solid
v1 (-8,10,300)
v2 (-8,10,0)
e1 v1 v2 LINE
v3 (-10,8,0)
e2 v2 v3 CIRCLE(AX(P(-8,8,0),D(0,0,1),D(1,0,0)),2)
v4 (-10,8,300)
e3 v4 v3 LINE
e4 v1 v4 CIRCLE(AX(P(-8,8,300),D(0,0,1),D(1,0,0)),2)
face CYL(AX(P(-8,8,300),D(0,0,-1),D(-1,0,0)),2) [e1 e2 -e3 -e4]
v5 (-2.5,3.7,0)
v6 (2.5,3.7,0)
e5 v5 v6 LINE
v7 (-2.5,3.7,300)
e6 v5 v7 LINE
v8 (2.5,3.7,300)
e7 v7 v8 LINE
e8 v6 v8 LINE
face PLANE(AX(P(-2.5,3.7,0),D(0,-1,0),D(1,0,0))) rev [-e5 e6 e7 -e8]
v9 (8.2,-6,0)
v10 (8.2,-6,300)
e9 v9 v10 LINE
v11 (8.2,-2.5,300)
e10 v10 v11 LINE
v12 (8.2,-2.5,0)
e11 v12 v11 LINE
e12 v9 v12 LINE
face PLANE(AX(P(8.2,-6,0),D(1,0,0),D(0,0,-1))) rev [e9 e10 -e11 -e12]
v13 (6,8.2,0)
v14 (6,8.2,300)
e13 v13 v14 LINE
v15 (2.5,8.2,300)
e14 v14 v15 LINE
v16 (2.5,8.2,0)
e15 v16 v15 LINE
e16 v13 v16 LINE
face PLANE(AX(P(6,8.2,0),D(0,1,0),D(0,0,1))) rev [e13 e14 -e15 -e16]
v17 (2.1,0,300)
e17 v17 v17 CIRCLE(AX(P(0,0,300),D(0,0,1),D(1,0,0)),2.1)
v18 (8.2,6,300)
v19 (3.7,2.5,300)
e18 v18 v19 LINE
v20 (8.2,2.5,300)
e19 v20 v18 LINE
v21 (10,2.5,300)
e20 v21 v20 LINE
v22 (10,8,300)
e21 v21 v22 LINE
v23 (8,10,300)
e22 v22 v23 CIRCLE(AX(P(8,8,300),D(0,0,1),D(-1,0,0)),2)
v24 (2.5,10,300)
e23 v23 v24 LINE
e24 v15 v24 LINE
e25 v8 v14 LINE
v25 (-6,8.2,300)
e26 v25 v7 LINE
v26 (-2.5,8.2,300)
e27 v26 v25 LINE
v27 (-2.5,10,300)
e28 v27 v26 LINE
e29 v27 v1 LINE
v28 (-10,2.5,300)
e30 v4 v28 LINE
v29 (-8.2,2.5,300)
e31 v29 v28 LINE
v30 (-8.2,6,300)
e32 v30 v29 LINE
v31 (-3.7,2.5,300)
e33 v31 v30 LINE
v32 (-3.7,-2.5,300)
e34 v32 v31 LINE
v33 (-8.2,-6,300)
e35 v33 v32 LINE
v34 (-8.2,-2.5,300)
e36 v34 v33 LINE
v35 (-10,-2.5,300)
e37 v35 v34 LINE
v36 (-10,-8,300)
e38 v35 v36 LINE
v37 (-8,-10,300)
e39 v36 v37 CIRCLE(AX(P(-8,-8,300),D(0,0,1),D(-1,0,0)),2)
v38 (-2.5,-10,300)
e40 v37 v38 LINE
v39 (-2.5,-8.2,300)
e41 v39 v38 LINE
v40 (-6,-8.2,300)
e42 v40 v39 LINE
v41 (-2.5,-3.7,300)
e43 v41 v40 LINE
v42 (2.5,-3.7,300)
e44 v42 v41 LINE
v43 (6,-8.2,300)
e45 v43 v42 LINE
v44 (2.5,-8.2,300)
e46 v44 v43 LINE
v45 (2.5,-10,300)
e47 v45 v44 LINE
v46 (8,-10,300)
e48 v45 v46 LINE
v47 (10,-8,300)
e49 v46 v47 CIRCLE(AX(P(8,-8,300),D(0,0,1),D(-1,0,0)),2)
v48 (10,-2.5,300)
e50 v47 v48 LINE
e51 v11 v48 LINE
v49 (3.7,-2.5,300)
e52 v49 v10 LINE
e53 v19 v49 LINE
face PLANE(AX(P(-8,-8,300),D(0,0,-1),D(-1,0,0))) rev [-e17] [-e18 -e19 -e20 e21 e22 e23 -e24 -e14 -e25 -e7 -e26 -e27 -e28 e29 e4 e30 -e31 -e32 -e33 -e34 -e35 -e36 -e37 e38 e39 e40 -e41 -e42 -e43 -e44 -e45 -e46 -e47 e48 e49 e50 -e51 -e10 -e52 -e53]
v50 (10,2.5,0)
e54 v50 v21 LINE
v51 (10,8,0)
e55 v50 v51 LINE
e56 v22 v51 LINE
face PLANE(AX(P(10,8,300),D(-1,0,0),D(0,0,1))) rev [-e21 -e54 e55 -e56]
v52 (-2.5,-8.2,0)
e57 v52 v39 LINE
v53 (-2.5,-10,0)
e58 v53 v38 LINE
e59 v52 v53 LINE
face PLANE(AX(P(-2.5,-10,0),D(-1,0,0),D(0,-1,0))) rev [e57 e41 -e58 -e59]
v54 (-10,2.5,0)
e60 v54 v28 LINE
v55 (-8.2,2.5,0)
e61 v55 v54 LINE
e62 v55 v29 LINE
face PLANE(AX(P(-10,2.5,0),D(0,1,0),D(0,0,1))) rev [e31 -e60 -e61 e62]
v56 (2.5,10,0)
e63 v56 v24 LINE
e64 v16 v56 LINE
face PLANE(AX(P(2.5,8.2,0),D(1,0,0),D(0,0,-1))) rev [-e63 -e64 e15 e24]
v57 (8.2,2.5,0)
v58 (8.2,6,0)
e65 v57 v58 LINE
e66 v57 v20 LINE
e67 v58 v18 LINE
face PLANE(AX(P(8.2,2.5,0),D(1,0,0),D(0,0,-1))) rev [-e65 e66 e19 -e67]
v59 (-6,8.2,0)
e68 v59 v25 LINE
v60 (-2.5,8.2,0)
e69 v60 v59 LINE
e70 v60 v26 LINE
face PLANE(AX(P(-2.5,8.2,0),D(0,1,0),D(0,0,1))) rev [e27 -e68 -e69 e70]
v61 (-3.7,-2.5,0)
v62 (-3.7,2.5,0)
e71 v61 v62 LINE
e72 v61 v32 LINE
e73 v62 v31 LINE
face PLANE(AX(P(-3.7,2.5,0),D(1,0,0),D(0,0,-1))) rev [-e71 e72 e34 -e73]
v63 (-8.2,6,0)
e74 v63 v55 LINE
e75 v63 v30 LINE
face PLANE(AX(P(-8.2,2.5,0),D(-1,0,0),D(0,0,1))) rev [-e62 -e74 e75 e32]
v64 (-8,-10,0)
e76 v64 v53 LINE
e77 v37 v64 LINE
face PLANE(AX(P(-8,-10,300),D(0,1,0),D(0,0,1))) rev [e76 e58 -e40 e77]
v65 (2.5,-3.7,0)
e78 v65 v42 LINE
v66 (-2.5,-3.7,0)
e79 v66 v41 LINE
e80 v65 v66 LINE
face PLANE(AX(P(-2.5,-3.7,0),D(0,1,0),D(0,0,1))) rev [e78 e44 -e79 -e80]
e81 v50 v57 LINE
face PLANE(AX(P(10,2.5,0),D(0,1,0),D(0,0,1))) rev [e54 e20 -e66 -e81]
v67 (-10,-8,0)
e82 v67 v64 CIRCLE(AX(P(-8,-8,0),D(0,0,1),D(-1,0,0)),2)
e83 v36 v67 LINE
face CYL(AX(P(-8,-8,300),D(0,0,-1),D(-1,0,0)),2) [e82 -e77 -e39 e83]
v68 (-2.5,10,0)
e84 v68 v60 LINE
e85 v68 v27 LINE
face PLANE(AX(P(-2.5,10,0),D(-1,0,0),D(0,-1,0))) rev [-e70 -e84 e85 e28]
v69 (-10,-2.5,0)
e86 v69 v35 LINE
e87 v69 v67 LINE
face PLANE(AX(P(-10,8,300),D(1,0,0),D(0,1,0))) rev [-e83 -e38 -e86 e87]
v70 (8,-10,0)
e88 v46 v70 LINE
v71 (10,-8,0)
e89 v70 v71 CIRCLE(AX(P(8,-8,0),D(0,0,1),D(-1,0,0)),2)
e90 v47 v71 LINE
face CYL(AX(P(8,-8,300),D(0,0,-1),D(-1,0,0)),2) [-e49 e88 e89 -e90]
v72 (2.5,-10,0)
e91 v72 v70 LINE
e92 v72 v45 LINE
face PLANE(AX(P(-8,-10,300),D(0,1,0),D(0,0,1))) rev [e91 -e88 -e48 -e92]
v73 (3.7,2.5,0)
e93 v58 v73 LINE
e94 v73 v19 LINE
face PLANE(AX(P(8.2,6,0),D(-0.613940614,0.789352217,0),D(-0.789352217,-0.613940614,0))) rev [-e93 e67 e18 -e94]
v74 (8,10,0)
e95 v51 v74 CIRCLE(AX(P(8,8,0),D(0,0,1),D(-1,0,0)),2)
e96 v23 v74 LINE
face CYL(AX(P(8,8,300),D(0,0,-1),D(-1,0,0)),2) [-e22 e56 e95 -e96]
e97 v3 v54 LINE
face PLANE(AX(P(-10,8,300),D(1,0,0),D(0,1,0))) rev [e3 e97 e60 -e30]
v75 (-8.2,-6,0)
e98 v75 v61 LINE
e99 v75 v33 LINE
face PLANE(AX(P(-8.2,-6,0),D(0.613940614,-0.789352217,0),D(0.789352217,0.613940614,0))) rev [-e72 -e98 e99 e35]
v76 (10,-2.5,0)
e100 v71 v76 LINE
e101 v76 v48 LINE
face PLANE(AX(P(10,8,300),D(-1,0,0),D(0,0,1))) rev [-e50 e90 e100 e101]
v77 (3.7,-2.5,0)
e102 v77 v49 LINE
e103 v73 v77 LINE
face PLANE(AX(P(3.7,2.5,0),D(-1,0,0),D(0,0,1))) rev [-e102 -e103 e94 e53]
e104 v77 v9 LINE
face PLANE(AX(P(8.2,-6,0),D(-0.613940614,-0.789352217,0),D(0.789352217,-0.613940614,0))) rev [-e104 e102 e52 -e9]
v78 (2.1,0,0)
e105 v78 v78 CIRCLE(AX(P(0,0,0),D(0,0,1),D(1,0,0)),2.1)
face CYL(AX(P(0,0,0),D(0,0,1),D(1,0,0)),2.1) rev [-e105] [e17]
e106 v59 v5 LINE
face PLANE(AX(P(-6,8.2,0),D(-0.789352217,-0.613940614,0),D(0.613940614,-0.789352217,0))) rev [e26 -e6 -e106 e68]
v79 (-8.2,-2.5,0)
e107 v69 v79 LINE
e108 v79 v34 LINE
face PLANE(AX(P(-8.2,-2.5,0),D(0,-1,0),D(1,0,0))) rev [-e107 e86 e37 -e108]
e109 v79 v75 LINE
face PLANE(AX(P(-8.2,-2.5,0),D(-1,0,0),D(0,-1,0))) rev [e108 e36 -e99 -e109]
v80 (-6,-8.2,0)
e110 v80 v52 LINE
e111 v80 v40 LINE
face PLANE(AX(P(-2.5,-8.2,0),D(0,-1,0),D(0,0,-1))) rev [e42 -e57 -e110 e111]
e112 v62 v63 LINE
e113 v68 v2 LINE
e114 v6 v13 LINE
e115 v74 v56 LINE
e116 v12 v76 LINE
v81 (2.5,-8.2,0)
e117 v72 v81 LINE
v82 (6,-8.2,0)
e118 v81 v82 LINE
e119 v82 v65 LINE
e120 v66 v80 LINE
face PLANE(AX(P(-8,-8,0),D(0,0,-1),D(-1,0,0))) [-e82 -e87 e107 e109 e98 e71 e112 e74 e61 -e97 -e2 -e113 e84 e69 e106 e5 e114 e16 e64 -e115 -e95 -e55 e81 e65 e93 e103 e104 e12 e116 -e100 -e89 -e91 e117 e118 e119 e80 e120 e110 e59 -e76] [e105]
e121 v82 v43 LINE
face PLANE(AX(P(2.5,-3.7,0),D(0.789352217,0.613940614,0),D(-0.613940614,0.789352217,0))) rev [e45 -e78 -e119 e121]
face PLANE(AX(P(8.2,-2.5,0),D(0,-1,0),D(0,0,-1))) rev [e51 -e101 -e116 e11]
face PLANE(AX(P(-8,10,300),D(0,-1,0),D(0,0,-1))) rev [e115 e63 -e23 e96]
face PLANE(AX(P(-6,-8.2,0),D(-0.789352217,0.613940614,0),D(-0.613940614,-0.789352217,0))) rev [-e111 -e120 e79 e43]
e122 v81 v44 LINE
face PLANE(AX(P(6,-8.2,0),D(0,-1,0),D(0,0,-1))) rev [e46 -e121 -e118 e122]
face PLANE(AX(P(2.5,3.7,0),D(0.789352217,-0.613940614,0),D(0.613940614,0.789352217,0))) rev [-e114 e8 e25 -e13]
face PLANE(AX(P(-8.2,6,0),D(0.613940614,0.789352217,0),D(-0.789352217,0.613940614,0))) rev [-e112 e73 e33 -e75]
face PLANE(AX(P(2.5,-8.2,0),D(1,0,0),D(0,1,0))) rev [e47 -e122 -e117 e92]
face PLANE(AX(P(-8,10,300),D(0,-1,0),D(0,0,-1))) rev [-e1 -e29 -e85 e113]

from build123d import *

# Parameters (mm, degrees)
EXTRUSION1_DEPTH        = 300
PER_AGE1_OUTLINE_R      = 2.1
PER_AGE1_DEPTH          = 300
ENL_V_MAT_EXTRU_1_DEPTH = 300
ENL_V_MAT_EXTRU_3_DEPTH = 300
ENL_V_MAT_EXTRU_4_DEPTH = 301.333148354
ENL_V_MAT_EXTRU_7_DEPTH = 301.333148354


# Read off the part's stored shape, not the designer's step: Perçage1
with BuildPart() as part:
    # Esquisse1 → Extrusion1 (new body)
    with BuildSketch(Plane.XY):
        with BuildLine():
            Line((-10, 8), (-10, -8))
            ThreePointArc((-10, -8), (-9.414213562, -9.414213562), (-8, -10))
            Line((-8, -10), (8, -10))
            ThreePointArc((8, -10), (9.414213562, -9.414213562), (10, -8))
            Line((10, -8), (10, 8))
            ThreePointArc((10, 8), (9.414213562, 9.414213562), (8, 10))
            Line((8, 10), (-8, 10))
            ThreePointArc((-8, 10), (-9.414213562, 9.414213562), (-10, 8))
        make_face()
    extrude(amount=EXTRUSION1_DEPTH)

    # Perçage1 outline → Perçage1 (cut)
    with BuildSketch(Plane.XY):
        Circle(PER_AGE1_OUTLINE_R)
    extrude(amount=PER_AGE1_DEPTH, mode=Mode.SUBTRACT)

    # Esquisse3 → Enlèv. mat.-Extru.1 (cut)
    with BuildSketch(Plane.XY.offset(300)):
        Polygon((10, 2.5), (8.2, 2.5), (8.2, 6), (3.7, 2.5), (3.7, -2.5), (8.2, -6), (8.2, -2.5), (10, -2.5), align=None)
    extrude(amount=-ENL_V_MAT_EXTRU_1_DEPTH, mode=Mode.SUBTRACT)

    # Esquisse5 → Enlèv. mat.-Extru.3 (cut)
    with BuildSketch(Plane.XY.offset(300)):
        Polygon((-2.5, 10), (-2.5, 8.2), (-6, 8.2), (-2.5, 3.7), (2.5, 3.7), (6, 8.2), (2.5, 8.2), (2.5, 10), align=None)
    extrude(amount=-ENL_V_MAT_EXTRU_3_DEPTH, mode=Mode.SUBTRACT)

    # Esquisse6 → Enlèv. mat.-Extru.4 (cut, through all)
    with BuildSketch(Plane.XY.offset(300)):
        Polygon((-2.5, -10), (-2.5, -8.2), (-6, -8.2), (-2.5, -3.7), (2.5, -3.7), (6, -8.2), (2.5, -8.2), (2.5, -10), align=None)
    extrude(amount=-ENL_V_MAT_EXTRU_4_DEPTH, mode=Mode.SUBTRACT)

    # Esquisse4 → Enlèv. mat.-Extru.7 (cut, through all)
    with BuildSketch(Plane.XY.offset(300)):
        Polygon((-10, 2.5), (-8.2, 2.5), (-8.2, 6), (-3.7, 2.5), (-3.7, -2.5), (-8.2, -6), (-8.2, -2.5), (-10, -2.5), align=None)
    extrude(amount=-ENL_V_MAT_EXTRU_7_DEPTH, mode=Mode.SUBTRACT)


solid = part.part
